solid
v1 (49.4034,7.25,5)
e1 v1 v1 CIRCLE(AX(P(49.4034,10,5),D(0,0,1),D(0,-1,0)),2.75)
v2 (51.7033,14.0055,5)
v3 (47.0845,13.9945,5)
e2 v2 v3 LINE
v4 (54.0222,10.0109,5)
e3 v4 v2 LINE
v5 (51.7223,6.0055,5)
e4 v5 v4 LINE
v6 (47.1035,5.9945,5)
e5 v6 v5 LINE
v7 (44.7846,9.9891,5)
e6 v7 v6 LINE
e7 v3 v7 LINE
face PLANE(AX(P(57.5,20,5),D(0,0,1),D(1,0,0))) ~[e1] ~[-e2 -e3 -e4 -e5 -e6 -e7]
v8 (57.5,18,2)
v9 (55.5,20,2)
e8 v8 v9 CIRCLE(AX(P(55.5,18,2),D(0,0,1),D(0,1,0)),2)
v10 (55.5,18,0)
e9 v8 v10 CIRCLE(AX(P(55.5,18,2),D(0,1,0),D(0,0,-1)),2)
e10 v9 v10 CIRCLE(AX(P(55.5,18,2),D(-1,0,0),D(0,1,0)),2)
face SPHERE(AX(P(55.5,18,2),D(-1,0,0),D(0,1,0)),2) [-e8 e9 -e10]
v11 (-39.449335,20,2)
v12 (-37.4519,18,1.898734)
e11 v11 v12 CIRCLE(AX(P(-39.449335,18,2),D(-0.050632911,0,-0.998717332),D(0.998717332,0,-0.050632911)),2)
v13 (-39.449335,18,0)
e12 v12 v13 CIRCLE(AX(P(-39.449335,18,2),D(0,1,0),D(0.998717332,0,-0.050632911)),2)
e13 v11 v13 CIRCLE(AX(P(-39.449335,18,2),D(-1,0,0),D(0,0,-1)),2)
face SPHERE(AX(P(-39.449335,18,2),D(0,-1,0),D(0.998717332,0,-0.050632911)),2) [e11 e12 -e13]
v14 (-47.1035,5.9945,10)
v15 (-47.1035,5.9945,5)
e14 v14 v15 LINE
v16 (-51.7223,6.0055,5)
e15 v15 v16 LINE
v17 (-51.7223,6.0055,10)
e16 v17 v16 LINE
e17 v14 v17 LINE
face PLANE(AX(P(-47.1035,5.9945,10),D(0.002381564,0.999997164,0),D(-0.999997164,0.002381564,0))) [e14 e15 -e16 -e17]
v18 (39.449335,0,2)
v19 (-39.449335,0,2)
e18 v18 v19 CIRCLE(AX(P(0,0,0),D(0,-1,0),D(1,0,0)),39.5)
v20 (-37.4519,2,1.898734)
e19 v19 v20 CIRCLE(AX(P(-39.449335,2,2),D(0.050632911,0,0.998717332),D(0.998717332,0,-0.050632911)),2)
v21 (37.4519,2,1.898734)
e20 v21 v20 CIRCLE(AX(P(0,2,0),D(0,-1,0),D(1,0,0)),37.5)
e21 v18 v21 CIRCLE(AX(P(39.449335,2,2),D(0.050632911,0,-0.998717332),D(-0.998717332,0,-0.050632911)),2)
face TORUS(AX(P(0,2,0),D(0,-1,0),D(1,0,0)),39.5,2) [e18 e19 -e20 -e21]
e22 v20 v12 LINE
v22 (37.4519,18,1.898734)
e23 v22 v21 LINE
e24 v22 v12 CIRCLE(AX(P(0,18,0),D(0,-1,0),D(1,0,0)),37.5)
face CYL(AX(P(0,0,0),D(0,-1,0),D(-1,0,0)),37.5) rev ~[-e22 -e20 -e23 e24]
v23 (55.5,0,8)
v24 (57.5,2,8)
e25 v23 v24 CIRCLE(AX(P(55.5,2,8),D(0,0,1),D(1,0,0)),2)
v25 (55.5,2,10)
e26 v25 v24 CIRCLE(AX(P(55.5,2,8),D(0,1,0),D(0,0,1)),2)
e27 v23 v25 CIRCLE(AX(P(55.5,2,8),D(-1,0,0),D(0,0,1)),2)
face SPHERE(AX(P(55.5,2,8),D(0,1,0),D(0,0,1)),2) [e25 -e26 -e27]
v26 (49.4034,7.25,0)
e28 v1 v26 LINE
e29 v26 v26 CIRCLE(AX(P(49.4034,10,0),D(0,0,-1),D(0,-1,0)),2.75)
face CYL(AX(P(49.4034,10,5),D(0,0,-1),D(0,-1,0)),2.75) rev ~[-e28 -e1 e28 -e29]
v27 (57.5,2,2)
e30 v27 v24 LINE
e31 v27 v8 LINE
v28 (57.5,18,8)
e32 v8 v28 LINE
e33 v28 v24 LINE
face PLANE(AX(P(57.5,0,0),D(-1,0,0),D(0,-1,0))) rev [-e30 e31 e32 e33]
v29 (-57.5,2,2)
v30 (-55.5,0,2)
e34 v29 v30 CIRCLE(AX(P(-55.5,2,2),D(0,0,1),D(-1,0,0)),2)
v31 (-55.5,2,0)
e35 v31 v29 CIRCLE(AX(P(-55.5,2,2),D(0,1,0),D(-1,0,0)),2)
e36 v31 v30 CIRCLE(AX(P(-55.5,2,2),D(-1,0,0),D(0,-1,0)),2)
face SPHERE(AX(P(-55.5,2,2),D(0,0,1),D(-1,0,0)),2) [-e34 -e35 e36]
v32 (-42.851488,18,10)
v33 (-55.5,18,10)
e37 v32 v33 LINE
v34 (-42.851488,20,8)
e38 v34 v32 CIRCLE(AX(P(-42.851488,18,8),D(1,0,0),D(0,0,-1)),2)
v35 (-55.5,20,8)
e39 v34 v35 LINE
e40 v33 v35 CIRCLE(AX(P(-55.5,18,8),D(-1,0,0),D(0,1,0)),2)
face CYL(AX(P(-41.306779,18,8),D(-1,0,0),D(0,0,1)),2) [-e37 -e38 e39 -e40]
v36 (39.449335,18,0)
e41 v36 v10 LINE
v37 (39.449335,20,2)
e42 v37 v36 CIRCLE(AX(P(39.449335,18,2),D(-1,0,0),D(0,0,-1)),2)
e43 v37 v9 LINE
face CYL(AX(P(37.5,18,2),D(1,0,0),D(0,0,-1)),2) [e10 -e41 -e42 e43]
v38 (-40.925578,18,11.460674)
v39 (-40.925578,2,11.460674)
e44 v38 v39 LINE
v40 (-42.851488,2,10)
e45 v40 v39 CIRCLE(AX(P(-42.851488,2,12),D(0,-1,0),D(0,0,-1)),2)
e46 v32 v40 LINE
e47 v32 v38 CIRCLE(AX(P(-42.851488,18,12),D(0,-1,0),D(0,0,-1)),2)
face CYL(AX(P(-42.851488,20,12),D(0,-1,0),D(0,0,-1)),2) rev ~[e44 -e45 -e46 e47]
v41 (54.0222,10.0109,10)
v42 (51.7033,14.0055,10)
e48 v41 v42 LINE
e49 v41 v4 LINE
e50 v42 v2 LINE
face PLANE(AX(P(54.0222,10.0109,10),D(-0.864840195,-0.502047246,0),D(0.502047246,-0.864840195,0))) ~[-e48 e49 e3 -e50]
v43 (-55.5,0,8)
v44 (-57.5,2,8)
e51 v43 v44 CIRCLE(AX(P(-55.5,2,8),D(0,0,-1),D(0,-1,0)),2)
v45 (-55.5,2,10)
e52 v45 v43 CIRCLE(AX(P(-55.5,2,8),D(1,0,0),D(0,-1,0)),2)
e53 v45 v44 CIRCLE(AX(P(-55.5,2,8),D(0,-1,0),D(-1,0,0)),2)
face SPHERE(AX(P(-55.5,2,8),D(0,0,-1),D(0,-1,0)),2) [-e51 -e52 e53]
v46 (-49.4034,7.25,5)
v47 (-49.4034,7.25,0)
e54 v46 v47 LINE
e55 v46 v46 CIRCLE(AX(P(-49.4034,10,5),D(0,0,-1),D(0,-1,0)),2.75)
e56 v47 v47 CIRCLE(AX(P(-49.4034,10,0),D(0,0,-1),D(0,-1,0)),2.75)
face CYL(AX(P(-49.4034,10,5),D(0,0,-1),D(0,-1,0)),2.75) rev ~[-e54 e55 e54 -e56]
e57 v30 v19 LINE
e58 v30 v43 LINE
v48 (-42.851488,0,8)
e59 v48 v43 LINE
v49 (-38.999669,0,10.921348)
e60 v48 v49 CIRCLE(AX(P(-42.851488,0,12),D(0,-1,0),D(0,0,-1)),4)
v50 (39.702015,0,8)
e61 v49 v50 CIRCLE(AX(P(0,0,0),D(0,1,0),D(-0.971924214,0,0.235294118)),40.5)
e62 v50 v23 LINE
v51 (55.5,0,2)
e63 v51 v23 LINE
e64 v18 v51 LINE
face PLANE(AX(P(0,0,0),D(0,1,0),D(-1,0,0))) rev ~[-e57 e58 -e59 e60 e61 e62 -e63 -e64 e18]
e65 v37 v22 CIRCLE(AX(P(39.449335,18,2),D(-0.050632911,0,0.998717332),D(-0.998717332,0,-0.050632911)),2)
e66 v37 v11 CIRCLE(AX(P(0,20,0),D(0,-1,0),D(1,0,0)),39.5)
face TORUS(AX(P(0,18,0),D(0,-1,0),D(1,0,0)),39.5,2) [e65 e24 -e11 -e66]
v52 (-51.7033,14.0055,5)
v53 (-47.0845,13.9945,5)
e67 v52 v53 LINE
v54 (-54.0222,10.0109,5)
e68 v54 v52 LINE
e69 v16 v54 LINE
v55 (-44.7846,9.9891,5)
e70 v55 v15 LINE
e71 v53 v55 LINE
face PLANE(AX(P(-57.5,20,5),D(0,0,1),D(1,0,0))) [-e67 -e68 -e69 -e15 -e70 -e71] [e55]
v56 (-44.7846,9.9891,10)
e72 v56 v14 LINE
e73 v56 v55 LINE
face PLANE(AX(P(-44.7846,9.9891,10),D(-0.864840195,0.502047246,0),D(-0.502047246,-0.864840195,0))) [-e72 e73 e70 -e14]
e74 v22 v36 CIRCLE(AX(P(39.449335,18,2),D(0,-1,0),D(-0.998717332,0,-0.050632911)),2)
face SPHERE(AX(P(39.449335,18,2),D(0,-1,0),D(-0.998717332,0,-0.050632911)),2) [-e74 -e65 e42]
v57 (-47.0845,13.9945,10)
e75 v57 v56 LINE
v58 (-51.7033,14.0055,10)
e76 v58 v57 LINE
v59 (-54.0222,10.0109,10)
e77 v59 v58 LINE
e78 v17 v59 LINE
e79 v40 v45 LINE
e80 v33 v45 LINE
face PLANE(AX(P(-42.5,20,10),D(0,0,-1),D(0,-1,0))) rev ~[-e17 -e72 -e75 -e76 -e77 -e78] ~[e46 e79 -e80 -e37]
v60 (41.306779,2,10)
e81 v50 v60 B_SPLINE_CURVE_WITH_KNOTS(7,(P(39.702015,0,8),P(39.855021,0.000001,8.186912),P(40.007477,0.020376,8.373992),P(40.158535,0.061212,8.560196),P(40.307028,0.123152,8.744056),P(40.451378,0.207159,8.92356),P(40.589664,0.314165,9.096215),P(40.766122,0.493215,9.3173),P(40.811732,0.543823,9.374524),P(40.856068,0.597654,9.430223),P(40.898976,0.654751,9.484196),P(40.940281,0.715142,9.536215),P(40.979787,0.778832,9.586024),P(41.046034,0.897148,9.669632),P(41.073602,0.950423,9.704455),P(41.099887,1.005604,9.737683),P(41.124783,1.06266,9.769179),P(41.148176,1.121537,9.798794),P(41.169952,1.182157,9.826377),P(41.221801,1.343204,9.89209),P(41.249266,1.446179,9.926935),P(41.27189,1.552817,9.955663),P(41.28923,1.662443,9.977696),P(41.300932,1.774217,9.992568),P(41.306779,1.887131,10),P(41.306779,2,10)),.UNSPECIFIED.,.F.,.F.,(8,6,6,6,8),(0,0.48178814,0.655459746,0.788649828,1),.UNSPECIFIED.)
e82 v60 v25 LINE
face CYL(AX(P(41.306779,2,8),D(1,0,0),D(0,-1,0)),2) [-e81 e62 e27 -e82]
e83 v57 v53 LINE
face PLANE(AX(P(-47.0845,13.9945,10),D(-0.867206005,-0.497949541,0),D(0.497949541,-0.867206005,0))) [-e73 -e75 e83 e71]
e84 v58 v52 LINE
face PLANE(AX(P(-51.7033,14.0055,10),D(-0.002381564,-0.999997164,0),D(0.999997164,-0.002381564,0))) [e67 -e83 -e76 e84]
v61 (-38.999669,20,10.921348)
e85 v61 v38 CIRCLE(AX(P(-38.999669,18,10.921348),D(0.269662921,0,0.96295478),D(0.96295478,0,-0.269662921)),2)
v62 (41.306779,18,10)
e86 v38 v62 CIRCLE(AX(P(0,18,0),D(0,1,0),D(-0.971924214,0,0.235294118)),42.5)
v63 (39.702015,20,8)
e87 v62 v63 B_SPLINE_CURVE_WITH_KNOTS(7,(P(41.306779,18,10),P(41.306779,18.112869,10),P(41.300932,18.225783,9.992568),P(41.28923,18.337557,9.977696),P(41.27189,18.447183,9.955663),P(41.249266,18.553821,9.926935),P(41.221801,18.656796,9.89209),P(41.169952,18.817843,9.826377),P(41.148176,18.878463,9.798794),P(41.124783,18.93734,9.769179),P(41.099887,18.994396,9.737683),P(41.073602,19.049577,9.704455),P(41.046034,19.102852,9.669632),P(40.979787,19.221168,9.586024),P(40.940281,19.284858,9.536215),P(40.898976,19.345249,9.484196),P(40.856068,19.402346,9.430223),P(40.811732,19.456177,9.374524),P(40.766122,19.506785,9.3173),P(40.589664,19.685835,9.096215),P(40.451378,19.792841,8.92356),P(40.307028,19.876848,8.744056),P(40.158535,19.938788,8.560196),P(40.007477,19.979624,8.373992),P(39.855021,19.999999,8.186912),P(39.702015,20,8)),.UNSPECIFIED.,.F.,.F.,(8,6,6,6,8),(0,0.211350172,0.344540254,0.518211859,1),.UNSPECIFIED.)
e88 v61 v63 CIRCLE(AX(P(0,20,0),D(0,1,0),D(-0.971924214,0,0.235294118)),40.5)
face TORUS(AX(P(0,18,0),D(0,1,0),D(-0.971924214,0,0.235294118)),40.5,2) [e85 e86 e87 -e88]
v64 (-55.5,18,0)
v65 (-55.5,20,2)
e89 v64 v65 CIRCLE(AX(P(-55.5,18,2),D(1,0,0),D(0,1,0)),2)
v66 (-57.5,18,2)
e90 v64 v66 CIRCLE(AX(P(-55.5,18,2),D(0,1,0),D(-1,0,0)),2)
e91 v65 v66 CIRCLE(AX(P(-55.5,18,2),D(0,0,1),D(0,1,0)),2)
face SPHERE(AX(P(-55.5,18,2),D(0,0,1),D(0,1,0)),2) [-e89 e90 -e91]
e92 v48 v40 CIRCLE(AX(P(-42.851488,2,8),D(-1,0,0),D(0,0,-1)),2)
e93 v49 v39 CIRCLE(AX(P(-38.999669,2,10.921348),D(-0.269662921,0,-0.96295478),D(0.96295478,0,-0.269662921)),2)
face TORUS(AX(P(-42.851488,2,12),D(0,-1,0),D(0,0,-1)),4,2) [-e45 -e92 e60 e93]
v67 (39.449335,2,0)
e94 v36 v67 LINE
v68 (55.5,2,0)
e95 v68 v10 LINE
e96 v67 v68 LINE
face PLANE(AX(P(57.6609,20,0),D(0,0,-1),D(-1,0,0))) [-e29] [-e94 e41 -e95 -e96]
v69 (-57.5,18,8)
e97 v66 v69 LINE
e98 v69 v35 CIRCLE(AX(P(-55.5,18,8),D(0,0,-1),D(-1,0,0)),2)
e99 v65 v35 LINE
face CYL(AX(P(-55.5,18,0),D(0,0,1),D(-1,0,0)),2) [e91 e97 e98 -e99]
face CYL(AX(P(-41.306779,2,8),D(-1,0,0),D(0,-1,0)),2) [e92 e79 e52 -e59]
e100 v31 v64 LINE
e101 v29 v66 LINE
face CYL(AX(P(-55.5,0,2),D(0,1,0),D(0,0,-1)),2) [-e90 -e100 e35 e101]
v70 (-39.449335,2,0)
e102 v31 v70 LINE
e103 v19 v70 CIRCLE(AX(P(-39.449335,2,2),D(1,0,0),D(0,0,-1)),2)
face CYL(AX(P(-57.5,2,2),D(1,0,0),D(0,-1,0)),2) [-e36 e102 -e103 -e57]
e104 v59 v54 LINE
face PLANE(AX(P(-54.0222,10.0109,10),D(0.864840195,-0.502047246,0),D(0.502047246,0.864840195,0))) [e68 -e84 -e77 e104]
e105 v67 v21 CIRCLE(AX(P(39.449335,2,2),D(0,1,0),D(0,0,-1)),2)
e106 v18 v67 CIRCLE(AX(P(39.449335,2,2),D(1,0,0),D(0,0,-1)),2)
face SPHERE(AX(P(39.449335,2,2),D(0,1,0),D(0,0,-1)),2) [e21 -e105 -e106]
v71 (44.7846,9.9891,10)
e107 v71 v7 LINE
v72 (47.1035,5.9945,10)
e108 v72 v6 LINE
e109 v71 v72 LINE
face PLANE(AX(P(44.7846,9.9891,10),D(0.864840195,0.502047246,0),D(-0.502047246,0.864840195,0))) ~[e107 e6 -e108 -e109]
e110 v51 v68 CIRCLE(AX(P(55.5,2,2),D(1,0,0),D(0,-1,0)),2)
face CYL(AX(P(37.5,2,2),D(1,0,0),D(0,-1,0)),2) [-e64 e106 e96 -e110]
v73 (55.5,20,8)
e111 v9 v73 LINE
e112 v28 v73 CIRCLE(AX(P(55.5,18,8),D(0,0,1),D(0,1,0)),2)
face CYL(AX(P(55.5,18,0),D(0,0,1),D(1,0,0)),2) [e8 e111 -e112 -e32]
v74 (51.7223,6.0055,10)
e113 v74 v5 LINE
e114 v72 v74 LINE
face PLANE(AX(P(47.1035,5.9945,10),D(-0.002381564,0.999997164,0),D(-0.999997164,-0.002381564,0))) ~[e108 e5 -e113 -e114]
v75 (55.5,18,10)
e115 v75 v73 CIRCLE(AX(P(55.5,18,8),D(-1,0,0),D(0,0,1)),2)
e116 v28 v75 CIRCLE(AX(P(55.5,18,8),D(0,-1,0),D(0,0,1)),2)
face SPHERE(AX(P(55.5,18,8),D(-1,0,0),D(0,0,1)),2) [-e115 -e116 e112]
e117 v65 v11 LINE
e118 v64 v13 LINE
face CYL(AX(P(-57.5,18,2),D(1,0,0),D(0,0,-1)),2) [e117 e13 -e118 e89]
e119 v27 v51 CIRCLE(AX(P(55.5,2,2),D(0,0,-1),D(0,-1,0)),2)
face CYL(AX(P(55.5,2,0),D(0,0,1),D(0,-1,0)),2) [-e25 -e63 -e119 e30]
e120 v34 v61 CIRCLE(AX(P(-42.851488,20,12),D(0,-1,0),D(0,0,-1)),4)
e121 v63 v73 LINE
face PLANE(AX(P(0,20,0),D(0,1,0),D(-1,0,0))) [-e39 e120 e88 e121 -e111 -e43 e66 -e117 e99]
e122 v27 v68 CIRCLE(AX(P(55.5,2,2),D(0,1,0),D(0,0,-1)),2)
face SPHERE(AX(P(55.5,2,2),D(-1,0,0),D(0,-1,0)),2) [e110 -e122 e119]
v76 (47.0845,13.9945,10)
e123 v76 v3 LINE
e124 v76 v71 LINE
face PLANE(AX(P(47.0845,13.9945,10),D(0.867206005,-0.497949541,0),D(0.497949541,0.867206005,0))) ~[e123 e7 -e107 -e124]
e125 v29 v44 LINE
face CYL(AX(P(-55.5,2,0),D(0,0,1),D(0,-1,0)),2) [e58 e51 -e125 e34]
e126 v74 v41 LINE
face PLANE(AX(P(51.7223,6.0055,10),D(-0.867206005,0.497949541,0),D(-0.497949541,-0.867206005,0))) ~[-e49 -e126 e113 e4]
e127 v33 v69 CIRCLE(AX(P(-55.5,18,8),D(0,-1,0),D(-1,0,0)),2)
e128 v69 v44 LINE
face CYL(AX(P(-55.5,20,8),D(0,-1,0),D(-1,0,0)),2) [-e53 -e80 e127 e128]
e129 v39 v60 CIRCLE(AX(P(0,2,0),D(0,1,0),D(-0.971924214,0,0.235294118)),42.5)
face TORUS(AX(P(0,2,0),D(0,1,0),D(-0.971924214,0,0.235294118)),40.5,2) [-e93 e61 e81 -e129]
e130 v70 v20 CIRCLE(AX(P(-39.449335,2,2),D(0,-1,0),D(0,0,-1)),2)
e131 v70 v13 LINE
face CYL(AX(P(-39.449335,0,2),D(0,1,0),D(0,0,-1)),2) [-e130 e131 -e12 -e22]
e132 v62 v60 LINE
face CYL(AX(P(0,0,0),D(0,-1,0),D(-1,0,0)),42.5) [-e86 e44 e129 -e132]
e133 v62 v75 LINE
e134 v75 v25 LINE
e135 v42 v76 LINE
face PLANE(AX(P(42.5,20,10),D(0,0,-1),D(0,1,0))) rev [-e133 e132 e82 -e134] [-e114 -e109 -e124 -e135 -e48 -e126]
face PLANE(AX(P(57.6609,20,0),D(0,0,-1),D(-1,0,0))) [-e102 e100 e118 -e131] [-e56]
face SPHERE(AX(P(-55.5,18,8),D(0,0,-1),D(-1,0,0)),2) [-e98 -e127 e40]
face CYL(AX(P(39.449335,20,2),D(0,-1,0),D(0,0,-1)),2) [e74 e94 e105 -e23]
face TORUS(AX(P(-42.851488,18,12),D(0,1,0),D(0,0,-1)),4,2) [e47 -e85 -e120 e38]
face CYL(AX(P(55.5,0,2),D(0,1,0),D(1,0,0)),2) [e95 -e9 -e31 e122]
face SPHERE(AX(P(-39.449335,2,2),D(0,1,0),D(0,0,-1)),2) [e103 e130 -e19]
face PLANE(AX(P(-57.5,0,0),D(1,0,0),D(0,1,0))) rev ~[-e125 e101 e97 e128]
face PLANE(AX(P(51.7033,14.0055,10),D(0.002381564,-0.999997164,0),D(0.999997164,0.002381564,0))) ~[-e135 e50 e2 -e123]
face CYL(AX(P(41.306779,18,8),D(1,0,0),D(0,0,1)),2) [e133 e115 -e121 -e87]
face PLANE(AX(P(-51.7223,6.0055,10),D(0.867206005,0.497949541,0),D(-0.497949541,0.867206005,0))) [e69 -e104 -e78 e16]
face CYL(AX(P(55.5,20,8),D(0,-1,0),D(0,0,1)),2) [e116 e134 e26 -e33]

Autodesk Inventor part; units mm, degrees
ref_plane "XZ Plane" through (0, 0, 0) normal (0, 1, 0) x (-1, 0, 0)
ref_plane "XY Plane" through (0, 0, 0) normal (0, 0, 1) x (1, 0, 0)
sketch "Sketch1" plane through (0, 0, 0) normal (0, 1, 0) x (-1, 0, 0)
  circle A0 centre (0, 0) radius 42.5
  dimension "d0" = 85
extrude "Extrusion1" add sketch "Sketch1" along normal blind 20
shell "Shell1" thickness 5 removed faces 2 at (10.6049, 20, 7.3037) at (10.6049, 0, 7.3037)
sketch "Sketch2" plane through (0, 20, 0) normal (0, 1, 0) x (1, 0, 0)
  line L0 (-62.0625, 51.3519) -> (57.6609, 51.3519)
  line L1 (57.6609, 51.3519) -> (57.6609, 0)
  line L2 (57.6609, 0) -> (-62.0625, 0)
  line L3 (-62.0625, 0) -> (-62.0625, 51.3519)
  point P0 (0, 0)
extrude "Extrusion2" cut sketch "Sketch2" against normal through all
ref_plane "Work Plane1" through (-42.5, 0, 0) normal (1, 0, 0) x (0, 1, 0)
sketch "Sketch3" plane through (-42.5, 0, 0) normal (1, 0, 0) x (0, 1, 0)
  line L0 (0, 0) -> (0, 42.5) projected
  line L1 (0, 0) -> (20, 0)
  line L2 (20, 0) -> (20, 10)
  line L3 (20, 10) -> (0, 10)
  line L4 (0, 10) -> (0, 0)
  point P0 (0, 10)
  dimension "d7" = 20
  dimension "d8" = 10
extrude "Extrusion3" add sketch "Sketch3" along normal blind 2 and the other way blind 15
mirror "Mirror1" about plane through (0, 0, 0) normal (1, 0, 0) of "Extrusion3"
sketch "Sketch6" plane through (-57.5, 20, 10) normal (0, 0, 1) x (1, 0, 0)
  line L0 (10.3965, -14.0055) -> (5.7777, -13.9945)
  line L1 (5.7777, -13.9945) -> (3.4778, -9.9891)
  line L2 (3.4778, -9.9891) -> (5.7967, -5.9945)
  line L3 (5.7967, -5.9945) -> (10.4155, -6.0055)
  line L4 (10.4155, -6.0055) -> (12.7154, -10.0109)
  line L5 (12.7154, -10.0109) -> (10.3965, -14.0055)
  line L6 (0, -20) -> (0, 0) projected
  line L7 (0, 0) -> (16.1932, 0) projected
  point P0 (57.5, -20)
  point P1 (8.0966, -10)
  point P2 (0, -10)
  point P3 (8.0966, 0)
  dimension "d27" = 8
extrude "Extrusion4" cut sketch "Sketch6" against normal blind 5
sketch "Sketch7" plane through (-57.5, 20, 5) normal (0, 0, 1) x (1, 0, 0)
  line L0 (0, -20) -> (0, 0) projected
  line L1 (0, 0) -> (16.1932, 0) projected
  point P0 (57.5, -20)
  point P1 (8.0966, -10)
  point P2 (0, -10)
  point P3 (8.0966, 0)
hole "Hole3" at (-49.4034, 10, 5) direction (0, 0, -1) diameter 5.5 end through all clearance for "Hex Head Bolt" size "M5" standard "Ansi Metric M Profile"
mirror "Mirror3" about plane through (0, 0, 0) normal (1, 0, 0) of "Extrusion4", "Hole3"
fillet "Fillet1" radius 2 23 edges at (-57.5, 0, 5) (-57.5, 20, 5) (-41.3068, 10, 10) (-49.4034, 0, 10) (-57.5, 10, 10) (-49.4034, 20, 10) (0, 20, 42.5) (0, 20, 37.5) (0, 0, 42.5) (-47.5, 20, 0) (47.5, 20, 0) (-57.5, 10, 0) (-47.5, 0, 0) (47.5, 0, 0) (0, 0, 37.5) (49.4034, 20, 10) (57.5, 10, 10) (49.4034, 0, 10) (57.5, 0, 5) (57.5, 20, 5) (57.5, 10, 0) (-37.5, 10, 0) (37.5, 10, 0)
properties part number "ur5e_cable_tube_bottom_75mm"
